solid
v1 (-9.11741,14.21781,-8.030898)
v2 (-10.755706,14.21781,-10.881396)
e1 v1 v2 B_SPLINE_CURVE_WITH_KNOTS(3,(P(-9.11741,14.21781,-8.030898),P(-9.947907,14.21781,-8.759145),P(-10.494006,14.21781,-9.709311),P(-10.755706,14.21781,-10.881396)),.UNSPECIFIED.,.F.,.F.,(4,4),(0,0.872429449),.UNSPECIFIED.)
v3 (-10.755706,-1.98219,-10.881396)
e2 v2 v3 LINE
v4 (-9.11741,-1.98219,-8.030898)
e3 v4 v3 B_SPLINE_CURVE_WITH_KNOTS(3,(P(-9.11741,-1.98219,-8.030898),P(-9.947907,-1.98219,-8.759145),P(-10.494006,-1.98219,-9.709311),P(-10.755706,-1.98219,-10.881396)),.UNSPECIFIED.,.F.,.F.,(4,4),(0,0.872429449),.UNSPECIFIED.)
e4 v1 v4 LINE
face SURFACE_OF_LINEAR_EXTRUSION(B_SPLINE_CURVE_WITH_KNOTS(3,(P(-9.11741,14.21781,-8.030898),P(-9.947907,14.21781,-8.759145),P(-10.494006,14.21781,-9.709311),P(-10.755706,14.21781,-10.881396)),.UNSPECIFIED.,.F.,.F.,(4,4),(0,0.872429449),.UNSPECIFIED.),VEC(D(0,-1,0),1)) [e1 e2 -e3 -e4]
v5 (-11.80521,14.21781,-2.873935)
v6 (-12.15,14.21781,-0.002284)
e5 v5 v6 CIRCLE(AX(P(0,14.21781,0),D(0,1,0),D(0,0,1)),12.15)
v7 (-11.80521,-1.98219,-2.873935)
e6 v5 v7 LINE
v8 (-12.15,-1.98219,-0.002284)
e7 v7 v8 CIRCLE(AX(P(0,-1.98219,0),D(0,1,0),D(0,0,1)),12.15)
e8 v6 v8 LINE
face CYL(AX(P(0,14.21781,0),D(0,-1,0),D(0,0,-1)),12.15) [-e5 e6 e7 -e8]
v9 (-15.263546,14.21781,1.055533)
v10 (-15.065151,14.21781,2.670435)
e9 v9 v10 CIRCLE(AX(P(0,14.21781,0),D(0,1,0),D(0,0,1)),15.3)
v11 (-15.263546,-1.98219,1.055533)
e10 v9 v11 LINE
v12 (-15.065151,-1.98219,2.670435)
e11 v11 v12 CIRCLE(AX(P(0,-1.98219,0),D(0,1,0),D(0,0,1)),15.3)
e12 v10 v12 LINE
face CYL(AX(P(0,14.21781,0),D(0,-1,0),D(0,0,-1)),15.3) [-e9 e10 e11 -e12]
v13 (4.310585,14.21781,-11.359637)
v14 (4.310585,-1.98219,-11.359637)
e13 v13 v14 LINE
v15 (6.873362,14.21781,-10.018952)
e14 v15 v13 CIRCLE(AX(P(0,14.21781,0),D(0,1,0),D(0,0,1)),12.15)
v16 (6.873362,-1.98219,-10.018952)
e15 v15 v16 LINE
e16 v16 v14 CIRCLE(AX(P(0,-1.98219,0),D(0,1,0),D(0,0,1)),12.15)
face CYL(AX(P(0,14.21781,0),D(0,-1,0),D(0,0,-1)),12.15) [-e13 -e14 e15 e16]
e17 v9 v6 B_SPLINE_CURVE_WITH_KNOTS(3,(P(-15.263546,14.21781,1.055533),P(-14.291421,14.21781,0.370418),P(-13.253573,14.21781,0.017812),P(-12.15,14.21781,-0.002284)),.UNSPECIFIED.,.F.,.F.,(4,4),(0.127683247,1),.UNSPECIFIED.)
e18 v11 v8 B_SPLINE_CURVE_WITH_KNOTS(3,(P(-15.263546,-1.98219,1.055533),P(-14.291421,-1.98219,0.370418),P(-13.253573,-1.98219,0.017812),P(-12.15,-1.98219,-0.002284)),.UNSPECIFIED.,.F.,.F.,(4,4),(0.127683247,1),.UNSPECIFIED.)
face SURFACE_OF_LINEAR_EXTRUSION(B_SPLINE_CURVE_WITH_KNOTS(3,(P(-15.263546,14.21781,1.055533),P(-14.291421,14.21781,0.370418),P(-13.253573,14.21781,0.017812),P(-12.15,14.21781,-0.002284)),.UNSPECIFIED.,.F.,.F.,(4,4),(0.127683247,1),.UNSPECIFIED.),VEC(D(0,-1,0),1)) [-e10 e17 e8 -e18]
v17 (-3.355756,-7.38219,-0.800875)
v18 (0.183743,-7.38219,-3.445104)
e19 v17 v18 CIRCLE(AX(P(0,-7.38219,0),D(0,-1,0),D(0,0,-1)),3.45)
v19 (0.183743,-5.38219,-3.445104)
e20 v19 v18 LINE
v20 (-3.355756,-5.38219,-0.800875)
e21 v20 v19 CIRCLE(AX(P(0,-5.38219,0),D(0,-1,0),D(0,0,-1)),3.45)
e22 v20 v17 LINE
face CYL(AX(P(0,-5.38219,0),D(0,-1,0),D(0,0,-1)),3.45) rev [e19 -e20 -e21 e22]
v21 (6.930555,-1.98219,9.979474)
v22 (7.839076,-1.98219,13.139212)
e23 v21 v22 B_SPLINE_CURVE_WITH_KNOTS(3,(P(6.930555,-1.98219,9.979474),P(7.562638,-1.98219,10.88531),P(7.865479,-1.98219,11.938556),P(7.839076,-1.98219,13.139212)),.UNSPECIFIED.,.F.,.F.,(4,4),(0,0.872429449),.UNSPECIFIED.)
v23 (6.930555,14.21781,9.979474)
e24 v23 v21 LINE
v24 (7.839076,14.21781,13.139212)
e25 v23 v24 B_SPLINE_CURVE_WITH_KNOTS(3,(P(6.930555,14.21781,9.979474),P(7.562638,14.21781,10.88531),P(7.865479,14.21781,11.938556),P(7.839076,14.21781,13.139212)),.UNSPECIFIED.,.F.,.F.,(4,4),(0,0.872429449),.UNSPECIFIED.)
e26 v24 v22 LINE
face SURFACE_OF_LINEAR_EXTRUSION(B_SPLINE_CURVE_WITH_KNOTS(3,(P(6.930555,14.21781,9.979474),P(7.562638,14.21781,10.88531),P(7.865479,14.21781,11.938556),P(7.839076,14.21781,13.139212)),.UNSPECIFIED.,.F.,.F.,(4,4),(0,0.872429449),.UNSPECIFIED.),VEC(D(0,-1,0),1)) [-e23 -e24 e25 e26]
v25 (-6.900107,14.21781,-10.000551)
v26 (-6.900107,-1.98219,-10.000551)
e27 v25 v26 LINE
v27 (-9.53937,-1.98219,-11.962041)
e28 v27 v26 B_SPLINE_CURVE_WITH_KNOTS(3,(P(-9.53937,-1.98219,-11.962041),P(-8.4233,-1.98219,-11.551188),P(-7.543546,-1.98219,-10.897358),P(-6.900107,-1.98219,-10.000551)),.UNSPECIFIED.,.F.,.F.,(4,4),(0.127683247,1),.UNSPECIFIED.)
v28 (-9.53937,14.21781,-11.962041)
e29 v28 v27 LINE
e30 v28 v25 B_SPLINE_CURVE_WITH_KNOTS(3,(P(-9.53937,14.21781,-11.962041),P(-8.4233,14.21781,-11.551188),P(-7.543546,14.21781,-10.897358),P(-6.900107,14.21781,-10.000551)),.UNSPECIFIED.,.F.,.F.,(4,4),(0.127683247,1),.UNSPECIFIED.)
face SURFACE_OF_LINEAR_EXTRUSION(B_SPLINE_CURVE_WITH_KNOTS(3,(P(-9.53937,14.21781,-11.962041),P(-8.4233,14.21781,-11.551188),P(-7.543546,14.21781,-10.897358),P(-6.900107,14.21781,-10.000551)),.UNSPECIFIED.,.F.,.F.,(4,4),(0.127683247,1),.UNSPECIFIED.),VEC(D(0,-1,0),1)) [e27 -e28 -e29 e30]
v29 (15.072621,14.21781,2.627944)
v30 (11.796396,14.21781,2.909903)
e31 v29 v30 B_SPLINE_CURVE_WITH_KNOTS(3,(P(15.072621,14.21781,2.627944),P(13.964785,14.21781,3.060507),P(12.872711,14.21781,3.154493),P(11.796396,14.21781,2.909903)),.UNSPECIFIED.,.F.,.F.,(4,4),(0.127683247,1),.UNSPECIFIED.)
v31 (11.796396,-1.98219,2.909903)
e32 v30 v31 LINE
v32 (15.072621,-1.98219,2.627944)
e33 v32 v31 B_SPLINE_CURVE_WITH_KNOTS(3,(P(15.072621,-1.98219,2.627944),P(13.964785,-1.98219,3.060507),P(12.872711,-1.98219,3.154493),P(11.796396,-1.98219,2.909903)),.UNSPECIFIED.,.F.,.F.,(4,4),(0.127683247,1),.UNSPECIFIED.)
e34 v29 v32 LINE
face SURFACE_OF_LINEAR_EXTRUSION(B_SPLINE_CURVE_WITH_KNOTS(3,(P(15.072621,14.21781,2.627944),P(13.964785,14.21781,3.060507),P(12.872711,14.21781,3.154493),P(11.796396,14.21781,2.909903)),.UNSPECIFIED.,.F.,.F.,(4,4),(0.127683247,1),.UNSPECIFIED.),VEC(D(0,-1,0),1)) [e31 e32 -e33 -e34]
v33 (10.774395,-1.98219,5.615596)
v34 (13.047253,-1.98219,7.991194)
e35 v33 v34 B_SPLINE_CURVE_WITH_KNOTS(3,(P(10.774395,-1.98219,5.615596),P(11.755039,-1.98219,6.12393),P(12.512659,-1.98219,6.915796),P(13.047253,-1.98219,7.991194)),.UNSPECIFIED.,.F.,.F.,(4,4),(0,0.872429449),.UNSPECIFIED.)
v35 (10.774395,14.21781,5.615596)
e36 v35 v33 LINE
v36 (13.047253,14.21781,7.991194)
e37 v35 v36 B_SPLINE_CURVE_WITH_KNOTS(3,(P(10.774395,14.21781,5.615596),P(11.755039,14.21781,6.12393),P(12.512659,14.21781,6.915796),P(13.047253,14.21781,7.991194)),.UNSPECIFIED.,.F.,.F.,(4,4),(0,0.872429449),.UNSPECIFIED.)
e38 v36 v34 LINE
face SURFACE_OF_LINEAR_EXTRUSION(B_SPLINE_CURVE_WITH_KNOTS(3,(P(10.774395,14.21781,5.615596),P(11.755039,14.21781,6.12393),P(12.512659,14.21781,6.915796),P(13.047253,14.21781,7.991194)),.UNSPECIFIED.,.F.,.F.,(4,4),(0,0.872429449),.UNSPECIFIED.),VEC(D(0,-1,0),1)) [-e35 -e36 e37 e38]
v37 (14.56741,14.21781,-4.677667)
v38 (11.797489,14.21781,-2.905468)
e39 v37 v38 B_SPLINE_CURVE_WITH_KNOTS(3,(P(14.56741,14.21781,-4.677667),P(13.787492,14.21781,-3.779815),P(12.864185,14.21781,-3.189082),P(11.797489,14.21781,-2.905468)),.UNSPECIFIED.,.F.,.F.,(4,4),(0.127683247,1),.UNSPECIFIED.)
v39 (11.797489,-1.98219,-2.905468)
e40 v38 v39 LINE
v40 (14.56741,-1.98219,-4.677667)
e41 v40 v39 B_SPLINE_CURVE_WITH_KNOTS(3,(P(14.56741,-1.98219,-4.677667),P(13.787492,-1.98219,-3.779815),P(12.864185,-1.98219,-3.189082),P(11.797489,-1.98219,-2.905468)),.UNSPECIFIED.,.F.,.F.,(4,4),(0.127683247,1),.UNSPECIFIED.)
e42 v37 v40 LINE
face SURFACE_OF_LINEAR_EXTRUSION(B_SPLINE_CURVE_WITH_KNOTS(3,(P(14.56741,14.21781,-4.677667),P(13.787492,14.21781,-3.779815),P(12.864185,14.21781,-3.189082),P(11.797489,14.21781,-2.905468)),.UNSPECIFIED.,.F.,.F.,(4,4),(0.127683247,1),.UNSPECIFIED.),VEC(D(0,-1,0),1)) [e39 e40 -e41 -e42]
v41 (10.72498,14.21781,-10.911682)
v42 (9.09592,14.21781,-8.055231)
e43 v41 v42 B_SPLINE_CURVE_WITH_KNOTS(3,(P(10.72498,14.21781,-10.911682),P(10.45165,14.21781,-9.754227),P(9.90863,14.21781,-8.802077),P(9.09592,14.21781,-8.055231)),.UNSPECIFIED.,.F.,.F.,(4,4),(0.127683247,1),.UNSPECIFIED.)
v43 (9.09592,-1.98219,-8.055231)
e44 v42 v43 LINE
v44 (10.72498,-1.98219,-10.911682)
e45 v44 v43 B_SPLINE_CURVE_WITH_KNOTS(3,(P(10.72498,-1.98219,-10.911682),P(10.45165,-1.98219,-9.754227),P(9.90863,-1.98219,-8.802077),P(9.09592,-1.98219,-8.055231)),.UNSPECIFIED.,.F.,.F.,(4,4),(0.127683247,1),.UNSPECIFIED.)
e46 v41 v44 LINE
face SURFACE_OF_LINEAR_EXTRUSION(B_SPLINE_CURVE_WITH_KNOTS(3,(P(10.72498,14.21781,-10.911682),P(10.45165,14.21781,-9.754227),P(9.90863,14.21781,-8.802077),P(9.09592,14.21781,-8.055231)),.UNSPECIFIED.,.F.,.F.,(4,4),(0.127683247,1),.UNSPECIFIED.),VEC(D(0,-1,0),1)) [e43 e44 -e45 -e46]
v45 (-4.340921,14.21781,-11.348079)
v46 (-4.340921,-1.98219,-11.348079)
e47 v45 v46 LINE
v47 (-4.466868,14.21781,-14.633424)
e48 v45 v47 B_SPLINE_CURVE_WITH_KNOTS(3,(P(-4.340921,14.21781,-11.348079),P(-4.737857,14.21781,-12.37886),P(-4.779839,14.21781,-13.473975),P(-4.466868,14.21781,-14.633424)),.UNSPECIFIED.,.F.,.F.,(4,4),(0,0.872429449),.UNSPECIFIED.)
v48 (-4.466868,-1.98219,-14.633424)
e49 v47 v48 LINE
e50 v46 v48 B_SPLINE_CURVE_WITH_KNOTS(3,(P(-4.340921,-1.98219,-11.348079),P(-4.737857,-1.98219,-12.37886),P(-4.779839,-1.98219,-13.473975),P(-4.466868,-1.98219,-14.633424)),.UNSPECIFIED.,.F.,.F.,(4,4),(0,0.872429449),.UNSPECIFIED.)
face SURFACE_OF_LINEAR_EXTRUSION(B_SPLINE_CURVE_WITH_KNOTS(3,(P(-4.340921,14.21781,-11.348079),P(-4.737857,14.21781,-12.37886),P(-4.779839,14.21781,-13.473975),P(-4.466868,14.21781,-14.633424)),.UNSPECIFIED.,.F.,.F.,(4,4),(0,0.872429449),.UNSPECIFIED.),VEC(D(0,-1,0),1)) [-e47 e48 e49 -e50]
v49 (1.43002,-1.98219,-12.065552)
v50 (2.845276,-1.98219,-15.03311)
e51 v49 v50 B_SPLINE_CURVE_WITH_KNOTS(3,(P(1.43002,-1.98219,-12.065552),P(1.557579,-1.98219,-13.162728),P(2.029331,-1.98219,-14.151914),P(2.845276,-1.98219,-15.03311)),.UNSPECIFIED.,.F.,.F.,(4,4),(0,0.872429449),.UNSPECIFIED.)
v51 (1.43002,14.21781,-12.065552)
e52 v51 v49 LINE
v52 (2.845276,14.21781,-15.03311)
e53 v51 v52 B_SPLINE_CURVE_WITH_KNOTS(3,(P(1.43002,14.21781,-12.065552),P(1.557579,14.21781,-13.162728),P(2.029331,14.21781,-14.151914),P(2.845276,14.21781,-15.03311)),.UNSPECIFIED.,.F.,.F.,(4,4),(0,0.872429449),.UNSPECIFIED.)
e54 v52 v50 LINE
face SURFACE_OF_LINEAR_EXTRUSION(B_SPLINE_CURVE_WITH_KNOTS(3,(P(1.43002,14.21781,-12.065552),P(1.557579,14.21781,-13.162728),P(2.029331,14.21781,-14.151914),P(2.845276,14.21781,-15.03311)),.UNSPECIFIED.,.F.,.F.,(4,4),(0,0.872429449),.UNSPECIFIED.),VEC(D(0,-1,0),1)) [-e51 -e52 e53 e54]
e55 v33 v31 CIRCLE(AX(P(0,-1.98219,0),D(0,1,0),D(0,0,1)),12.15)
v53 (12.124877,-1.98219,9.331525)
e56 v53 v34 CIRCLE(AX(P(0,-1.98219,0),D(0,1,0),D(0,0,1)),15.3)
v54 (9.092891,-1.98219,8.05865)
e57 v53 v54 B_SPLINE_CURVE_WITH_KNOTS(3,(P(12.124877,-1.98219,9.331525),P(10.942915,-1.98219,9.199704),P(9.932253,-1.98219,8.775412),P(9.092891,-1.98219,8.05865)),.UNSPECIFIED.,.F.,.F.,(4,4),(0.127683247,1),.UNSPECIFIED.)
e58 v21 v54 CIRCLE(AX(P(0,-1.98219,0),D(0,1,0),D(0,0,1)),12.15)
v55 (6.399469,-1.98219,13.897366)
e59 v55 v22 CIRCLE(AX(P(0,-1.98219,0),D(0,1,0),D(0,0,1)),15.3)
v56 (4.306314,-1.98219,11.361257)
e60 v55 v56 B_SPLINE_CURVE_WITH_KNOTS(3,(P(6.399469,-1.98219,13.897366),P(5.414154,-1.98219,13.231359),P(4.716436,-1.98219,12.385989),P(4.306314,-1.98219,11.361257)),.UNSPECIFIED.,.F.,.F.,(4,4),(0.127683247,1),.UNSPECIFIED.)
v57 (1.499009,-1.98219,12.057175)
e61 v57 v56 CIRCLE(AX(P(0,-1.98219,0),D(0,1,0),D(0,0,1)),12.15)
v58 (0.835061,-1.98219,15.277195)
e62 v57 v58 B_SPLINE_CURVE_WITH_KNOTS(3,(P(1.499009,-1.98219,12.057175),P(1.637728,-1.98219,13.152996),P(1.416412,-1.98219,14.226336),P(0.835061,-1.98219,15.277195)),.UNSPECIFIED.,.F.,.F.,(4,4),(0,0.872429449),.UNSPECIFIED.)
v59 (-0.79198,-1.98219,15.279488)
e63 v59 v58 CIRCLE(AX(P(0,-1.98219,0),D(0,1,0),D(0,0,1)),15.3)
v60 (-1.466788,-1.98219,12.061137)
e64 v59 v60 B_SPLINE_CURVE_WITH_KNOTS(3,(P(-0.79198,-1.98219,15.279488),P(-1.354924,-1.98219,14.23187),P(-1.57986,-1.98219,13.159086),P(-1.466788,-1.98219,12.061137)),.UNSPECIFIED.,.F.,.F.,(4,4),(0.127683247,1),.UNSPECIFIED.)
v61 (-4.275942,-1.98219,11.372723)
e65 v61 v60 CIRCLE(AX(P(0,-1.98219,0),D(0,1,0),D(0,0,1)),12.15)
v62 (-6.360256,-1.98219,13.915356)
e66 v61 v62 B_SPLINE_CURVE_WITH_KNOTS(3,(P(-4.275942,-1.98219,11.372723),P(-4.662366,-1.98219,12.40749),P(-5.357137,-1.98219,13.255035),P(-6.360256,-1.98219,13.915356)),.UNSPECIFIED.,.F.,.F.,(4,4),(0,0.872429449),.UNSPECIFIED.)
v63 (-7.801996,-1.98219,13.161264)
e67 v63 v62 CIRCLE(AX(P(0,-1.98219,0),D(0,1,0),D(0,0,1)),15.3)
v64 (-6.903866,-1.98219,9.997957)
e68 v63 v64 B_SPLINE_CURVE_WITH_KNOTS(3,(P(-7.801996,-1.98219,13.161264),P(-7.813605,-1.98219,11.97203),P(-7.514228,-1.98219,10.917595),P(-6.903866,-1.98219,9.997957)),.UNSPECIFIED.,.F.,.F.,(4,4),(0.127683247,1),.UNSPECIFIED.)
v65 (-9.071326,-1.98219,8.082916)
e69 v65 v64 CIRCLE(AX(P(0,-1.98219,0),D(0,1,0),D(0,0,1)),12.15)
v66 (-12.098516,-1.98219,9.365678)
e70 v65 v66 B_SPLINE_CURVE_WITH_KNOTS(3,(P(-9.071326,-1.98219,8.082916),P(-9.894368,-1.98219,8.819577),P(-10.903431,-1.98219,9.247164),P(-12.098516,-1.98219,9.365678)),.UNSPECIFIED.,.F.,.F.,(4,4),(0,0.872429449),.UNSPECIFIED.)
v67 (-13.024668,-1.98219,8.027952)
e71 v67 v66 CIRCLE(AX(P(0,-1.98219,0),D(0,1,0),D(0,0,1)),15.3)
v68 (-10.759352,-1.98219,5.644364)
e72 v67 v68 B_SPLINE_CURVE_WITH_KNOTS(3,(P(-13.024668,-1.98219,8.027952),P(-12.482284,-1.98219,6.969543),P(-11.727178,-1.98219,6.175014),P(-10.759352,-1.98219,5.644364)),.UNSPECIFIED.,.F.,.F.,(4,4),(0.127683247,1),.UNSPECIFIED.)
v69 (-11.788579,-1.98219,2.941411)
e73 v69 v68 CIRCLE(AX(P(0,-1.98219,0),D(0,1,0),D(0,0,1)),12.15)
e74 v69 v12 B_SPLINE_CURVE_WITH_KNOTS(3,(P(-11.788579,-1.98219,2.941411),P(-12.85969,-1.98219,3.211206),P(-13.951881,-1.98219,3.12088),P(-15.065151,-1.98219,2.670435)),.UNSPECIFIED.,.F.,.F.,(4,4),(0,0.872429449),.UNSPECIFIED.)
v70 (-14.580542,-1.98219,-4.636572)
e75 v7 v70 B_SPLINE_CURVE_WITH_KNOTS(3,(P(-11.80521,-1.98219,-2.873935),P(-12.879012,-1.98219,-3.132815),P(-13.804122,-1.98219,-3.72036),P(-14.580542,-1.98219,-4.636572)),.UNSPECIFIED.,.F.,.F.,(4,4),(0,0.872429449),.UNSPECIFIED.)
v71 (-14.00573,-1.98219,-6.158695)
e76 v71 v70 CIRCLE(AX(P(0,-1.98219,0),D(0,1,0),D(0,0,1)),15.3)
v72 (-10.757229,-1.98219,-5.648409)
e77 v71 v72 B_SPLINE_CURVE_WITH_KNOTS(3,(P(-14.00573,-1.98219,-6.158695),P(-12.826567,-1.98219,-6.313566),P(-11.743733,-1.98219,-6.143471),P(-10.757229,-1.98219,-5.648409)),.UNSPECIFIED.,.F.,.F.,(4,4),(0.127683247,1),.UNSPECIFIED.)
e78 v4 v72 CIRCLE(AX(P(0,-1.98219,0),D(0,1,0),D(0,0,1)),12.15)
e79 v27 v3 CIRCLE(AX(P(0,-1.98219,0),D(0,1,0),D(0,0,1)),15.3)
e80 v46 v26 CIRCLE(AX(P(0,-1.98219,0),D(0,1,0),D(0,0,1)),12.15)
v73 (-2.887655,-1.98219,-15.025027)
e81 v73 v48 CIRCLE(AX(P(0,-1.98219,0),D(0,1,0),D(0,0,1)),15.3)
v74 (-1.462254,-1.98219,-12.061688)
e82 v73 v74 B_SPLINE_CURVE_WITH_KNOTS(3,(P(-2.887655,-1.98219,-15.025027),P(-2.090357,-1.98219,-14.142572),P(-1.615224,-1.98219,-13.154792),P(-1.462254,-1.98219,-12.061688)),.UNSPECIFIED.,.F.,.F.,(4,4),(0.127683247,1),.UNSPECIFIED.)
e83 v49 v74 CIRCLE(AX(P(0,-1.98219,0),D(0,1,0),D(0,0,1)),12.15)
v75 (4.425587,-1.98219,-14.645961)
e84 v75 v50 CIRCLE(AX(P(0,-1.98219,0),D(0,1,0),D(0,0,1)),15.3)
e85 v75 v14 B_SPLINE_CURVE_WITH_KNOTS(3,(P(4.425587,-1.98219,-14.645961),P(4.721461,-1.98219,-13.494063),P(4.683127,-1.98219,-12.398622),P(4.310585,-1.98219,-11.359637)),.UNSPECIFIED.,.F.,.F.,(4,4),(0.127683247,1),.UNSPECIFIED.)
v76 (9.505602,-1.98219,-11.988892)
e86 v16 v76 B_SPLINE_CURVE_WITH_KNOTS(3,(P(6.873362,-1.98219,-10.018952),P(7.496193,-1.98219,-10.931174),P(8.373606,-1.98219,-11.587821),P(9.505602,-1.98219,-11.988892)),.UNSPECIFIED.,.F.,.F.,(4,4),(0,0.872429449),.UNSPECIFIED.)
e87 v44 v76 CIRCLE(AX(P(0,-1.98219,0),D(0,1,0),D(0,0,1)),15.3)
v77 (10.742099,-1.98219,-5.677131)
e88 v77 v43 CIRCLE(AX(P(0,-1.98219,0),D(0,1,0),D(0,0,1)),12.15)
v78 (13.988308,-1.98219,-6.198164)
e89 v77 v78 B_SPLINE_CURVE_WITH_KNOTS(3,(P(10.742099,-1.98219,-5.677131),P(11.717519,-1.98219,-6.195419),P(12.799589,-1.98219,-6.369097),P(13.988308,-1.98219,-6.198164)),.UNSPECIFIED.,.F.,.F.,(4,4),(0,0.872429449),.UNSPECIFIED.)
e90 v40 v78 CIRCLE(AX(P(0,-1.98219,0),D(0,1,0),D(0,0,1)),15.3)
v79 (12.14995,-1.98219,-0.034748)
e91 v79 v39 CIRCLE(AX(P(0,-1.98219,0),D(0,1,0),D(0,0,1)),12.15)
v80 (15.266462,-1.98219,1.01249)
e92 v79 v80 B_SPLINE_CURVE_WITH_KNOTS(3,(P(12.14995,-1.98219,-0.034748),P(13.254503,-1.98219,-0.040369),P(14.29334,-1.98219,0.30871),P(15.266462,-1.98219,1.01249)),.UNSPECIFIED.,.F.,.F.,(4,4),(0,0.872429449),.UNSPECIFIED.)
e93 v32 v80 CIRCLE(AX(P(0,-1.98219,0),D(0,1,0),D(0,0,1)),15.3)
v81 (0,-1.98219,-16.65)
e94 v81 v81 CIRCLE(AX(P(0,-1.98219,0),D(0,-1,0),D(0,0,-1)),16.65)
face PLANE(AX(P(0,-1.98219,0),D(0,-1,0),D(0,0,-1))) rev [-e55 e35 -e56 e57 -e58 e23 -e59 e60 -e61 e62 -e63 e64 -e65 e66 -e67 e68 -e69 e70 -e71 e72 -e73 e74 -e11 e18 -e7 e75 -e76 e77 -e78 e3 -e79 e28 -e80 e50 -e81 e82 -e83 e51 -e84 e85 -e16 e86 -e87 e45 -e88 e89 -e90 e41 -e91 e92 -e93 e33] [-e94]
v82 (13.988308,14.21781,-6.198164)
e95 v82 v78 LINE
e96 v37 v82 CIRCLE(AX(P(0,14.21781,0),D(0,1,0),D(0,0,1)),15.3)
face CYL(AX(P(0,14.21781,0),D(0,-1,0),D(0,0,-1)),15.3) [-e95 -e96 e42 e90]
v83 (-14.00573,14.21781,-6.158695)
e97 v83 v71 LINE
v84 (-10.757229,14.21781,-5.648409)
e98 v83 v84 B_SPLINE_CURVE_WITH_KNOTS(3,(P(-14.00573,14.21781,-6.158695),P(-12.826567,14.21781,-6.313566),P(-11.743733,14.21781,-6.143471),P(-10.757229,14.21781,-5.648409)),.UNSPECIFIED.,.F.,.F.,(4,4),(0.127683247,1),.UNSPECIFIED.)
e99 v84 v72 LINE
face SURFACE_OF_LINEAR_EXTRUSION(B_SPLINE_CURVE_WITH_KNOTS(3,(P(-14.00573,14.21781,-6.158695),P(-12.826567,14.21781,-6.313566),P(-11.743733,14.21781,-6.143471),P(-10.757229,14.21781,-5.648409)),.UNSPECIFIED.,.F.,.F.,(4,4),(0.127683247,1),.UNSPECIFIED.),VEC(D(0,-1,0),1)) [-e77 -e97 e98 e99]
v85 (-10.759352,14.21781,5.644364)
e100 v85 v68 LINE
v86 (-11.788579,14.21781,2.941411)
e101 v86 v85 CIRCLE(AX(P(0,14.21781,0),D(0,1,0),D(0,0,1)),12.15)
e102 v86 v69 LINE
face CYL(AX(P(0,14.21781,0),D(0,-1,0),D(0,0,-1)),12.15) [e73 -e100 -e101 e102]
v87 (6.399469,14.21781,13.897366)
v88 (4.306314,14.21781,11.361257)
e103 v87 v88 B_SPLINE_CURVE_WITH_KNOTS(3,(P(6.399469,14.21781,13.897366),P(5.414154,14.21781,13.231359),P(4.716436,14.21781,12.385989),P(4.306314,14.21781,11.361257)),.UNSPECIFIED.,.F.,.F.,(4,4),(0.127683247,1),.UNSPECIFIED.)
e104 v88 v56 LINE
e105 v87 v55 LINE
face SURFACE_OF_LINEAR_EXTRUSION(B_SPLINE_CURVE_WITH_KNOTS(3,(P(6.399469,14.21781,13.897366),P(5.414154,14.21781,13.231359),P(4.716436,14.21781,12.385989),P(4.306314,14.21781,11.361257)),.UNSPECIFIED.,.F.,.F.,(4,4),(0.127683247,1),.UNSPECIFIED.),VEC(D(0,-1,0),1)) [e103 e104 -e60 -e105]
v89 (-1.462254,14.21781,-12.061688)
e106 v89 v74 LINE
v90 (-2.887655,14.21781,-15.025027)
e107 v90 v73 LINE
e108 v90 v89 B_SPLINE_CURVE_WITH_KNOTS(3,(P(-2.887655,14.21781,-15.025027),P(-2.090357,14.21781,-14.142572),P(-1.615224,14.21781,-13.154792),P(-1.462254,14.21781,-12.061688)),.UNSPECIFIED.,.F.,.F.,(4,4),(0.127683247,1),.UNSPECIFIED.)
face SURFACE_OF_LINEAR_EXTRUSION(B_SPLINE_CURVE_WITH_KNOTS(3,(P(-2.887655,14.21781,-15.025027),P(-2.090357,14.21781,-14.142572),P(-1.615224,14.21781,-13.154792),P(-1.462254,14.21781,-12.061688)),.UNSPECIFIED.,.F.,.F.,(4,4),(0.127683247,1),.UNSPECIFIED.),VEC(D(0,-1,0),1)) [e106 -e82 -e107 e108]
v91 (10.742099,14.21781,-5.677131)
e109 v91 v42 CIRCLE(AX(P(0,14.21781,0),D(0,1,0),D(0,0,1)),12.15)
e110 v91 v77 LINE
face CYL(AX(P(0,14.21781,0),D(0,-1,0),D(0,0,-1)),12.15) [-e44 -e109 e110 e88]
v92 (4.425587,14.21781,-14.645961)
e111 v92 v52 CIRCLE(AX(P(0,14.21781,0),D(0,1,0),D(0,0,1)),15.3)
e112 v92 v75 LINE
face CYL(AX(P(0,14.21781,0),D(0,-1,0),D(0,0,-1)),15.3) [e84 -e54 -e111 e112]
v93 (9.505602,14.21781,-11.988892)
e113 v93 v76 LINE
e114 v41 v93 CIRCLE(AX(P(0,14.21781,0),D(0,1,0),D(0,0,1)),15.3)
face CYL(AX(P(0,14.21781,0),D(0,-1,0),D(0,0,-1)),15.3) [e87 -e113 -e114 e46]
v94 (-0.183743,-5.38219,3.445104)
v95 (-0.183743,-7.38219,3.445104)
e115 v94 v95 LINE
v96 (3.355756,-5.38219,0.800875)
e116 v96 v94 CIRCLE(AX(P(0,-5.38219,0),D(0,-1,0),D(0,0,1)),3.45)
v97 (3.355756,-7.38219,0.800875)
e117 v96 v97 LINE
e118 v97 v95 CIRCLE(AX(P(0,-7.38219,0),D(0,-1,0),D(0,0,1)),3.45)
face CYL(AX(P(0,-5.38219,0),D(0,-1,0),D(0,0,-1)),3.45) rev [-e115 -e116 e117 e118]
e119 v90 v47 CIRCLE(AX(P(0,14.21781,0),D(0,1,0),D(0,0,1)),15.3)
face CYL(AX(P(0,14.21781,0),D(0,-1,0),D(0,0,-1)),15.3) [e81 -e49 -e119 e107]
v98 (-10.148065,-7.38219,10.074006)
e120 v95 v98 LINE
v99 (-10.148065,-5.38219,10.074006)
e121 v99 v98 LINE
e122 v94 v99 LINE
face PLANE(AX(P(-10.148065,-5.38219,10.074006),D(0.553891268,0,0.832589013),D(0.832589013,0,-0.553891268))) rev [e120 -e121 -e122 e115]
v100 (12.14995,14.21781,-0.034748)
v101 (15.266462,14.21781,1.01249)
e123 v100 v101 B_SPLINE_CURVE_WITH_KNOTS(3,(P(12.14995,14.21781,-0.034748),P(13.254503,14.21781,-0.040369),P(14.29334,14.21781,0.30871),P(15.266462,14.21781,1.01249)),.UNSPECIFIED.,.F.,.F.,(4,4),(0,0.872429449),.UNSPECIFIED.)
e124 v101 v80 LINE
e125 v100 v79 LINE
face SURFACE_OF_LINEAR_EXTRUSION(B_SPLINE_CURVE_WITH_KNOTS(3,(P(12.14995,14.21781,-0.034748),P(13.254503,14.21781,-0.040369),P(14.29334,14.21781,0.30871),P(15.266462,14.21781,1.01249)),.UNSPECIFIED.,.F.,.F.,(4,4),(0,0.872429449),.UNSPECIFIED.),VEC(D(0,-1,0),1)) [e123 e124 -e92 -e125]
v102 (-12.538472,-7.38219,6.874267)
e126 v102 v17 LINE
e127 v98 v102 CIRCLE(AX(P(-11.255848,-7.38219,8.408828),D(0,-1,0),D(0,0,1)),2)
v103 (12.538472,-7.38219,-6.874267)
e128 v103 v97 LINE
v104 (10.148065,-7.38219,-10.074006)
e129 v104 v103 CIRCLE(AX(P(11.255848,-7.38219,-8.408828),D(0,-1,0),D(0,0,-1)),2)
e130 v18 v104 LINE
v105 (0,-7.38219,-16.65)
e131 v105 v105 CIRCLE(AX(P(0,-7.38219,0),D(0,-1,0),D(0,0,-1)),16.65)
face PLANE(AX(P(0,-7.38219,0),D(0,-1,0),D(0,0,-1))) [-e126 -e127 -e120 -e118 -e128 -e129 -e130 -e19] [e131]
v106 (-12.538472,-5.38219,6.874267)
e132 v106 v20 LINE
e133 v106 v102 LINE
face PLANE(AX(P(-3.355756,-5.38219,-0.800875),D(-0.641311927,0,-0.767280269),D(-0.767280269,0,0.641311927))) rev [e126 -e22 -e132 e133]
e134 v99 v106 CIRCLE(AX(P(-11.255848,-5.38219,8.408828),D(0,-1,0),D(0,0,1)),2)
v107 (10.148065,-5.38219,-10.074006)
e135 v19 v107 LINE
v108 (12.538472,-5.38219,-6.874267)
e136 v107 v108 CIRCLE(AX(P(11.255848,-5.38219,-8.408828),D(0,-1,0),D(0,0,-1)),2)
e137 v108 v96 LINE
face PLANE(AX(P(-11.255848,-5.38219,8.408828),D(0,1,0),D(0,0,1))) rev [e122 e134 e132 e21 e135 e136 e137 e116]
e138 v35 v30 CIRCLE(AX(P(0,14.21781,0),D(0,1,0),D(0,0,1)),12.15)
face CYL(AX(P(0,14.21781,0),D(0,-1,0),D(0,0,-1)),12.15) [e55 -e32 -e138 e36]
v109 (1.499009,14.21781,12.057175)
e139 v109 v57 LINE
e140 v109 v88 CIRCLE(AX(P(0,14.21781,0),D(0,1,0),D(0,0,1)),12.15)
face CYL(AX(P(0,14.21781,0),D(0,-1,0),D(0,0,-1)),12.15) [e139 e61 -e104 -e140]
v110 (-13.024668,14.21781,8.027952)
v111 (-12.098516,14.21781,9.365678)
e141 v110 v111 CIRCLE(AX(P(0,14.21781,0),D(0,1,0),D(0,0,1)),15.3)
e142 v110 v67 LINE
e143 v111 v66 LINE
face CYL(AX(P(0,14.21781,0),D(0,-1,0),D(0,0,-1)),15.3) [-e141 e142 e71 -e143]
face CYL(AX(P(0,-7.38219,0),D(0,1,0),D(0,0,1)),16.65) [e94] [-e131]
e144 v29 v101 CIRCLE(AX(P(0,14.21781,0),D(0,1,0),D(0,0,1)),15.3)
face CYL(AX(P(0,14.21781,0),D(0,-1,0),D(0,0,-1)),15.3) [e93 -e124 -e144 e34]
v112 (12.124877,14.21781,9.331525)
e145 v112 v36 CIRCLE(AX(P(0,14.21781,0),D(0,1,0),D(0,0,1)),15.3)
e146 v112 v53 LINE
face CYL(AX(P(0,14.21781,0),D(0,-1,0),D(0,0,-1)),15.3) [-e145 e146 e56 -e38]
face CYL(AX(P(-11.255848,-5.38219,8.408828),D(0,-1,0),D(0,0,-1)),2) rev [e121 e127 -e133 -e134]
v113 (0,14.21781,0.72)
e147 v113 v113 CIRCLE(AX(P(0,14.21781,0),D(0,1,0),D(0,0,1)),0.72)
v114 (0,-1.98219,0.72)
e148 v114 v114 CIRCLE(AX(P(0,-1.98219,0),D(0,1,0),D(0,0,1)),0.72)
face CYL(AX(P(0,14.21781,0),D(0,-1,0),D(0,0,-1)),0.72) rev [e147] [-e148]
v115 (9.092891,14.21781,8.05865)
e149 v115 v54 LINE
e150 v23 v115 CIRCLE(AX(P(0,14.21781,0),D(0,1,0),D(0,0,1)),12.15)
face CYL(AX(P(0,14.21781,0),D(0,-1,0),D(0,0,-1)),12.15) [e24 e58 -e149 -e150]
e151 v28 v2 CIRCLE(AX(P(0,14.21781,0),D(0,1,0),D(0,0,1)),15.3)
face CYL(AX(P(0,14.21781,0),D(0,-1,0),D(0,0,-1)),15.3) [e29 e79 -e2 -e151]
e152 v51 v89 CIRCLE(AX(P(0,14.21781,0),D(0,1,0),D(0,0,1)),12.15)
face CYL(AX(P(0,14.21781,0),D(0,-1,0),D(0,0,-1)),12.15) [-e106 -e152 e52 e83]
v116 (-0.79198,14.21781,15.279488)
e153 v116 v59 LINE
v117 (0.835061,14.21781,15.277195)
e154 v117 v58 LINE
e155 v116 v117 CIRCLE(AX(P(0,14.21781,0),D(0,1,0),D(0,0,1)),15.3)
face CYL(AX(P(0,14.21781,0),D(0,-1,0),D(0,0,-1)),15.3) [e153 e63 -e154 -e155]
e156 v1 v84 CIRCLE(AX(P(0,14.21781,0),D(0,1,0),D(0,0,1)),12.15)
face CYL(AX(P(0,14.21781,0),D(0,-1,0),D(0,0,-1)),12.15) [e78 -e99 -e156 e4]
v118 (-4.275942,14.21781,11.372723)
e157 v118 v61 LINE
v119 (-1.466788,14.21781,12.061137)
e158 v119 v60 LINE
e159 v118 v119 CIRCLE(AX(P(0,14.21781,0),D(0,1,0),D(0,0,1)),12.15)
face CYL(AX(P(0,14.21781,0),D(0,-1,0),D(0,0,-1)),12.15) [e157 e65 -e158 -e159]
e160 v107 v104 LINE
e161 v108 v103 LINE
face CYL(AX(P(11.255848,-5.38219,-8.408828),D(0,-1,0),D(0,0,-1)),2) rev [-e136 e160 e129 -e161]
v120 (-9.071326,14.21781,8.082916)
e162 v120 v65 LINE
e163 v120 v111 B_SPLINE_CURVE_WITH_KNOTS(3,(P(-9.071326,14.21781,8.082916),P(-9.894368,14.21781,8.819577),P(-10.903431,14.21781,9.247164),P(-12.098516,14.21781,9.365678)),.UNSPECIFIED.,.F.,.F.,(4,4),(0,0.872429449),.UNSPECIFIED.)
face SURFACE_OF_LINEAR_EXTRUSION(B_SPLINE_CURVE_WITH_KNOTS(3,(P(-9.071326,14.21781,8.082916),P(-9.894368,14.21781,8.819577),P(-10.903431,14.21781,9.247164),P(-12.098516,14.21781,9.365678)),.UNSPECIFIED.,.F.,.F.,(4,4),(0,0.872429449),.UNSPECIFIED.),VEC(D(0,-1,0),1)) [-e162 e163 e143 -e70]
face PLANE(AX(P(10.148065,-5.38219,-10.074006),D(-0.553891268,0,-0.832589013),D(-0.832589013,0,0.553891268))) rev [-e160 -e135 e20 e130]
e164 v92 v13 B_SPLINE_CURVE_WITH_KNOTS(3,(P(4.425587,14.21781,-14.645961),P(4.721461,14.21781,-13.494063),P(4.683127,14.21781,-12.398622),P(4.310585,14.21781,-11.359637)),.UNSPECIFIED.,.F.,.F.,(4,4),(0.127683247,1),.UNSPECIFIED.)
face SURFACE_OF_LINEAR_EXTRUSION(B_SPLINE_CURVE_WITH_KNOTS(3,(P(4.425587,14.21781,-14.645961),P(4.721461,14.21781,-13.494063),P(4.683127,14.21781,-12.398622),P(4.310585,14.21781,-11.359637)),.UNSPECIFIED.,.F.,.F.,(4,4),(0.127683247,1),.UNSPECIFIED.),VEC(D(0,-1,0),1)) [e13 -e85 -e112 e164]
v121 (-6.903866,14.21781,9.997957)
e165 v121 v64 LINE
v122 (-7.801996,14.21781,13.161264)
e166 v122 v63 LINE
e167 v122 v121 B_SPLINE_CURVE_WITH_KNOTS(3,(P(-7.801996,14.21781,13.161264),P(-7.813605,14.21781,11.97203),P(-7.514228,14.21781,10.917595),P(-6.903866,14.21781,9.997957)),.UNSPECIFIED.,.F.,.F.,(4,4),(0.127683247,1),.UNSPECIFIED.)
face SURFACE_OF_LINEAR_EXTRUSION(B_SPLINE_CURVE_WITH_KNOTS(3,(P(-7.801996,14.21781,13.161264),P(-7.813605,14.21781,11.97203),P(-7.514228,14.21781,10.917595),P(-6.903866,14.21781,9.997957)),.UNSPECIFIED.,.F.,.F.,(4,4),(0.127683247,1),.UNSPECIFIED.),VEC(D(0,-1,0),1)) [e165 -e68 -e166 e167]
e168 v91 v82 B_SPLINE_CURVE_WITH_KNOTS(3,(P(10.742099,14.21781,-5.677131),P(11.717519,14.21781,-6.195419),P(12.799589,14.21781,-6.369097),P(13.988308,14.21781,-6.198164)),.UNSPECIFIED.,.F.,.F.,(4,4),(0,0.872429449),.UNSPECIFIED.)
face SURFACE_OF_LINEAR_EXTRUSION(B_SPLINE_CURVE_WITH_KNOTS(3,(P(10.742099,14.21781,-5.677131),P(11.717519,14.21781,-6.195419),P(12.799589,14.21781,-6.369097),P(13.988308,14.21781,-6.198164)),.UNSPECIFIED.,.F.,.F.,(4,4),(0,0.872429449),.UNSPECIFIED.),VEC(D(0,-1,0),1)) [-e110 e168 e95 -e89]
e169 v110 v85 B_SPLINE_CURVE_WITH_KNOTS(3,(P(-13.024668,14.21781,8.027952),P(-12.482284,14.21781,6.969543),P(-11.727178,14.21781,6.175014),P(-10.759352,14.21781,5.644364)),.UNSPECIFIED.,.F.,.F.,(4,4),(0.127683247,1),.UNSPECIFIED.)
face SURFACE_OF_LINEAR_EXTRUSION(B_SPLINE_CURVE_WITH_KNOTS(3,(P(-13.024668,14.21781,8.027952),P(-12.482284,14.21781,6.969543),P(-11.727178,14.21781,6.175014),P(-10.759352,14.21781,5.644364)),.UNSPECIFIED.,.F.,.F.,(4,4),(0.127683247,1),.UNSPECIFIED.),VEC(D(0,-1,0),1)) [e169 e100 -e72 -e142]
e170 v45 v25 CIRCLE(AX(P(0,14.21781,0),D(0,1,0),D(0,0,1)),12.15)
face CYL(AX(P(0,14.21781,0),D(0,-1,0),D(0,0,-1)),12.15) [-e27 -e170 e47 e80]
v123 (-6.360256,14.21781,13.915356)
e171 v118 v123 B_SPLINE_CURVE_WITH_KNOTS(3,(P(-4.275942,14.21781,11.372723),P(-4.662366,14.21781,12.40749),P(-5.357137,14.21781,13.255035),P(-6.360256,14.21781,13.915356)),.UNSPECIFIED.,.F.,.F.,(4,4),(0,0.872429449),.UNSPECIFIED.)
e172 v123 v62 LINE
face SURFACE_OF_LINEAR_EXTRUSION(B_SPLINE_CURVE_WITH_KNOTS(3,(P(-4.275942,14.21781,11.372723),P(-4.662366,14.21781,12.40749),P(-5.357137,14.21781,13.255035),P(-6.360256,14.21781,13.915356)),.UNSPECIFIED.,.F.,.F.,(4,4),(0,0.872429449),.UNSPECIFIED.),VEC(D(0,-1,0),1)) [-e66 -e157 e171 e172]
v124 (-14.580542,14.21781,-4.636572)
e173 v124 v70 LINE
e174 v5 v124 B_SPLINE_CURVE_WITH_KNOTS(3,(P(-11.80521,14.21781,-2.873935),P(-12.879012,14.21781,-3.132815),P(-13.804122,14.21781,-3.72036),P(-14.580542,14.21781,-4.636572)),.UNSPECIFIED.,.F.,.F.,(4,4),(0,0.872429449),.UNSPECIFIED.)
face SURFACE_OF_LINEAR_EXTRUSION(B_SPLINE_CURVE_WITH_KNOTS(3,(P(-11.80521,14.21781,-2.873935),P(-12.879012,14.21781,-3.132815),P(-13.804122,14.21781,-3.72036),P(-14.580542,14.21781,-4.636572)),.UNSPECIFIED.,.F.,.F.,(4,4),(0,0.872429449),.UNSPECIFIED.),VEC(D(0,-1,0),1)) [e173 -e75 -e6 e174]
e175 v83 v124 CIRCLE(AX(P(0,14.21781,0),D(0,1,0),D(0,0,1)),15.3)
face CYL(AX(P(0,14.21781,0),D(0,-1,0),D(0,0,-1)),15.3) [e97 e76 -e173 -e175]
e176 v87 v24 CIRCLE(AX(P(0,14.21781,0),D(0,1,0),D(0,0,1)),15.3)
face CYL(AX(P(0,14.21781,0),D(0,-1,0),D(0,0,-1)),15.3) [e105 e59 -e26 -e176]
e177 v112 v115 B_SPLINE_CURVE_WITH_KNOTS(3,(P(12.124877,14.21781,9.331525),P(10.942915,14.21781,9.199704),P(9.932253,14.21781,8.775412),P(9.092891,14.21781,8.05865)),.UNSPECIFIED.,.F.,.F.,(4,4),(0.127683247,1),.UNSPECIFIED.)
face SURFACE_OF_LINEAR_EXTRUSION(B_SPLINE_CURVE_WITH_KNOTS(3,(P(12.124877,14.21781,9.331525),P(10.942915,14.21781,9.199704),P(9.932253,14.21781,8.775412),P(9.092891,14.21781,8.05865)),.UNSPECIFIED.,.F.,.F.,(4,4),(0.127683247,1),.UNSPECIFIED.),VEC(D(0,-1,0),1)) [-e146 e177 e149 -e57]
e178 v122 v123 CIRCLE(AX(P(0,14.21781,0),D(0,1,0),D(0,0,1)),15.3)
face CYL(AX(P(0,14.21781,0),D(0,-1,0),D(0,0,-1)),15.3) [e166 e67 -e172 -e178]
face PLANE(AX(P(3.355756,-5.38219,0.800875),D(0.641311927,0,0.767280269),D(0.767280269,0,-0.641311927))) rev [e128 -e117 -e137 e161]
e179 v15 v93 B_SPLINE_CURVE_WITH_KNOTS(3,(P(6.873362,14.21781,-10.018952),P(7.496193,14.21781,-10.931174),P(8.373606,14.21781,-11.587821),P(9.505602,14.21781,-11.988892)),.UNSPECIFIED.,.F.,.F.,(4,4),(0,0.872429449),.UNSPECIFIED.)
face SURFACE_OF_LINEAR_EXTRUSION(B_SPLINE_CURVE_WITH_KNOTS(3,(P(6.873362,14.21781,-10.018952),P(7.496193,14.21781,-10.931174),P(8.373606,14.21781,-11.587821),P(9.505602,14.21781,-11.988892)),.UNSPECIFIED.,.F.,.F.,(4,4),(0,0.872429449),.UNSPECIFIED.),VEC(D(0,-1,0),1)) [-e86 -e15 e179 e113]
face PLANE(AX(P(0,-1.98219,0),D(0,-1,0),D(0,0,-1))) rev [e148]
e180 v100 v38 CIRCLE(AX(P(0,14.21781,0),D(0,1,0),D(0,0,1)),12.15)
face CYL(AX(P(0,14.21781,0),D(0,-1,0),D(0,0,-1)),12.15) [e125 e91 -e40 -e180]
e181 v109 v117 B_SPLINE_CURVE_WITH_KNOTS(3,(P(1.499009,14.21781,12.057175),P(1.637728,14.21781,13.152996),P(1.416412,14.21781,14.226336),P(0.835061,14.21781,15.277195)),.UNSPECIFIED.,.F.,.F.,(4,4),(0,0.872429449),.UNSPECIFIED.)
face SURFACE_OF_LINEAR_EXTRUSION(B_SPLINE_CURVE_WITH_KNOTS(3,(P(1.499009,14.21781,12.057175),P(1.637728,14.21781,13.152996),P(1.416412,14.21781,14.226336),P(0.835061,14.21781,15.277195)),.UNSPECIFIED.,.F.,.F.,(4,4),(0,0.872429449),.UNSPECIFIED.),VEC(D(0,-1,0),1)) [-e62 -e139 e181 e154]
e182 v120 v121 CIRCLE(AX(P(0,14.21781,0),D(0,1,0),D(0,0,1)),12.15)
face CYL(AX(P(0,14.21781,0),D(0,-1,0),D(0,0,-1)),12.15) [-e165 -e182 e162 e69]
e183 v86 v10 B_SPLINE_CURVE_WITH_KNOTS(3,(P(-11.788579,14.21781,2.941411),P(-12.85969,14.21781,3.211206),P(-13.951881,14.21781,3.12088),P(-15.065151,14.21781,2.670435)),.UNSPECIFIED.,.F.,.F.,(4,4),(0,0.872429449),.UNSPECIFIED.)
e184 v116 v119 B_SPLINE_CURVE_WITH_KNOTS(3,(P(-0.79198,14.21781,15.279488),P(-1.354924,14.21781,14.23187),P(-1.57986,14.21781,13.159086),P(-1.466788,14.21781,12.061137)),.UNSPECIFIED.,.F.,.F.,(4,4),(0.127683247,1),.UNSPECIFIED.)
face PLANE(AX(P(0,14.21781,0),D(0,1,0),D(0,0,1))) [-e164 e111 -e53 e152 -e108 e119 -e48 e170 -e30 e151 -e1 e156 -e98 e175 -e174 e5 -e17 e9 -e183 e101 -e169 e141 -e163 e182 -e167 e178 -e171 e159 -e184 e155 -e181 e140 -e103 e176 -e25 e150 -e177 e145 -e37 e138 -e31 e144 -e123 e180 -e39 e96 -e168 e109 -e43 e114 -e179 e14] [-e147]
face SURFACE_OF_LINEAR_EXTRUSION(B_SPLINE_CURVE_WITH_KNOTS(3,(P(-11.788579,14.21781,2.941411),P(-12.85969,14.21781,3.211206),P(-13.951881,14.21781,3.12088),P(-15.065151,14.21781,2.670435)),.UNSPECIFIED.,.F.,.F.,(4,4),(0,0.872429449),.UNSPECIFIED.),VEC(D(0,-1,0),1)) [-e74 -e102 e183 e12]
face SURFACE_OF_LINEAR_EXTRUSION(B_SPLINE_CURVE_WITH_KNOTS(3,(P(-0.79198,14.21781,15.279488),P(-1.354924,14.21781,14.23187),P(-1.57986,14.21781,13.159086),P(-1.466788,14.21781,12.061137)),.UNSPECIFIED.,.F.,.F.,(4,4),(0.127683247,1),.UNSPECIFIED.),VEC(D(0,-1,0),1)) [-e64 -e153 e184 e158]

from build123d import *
from OCP.BRepAlgoAPI import BRepAlgoAPI_Cut
from OCP.TopTools import TopTools_ListOfShape

# Parameters (mm, degrees)
SKETCH1_R           = 0.4
BOSS_EXTRUDE1_DEPTH = 9
SKETCH2_R           = 9.25
BOSS_EXTRUDE2_DEPTH = 3
SCALE1_SCALE        = 1.8
CUT_EXTRUDE1_DEPTH  = 2


with BuildPart() as part:
    # Sketch1 → Boss-Extrude1 (new body)
    with BuildSketch(Plane(origin=(0, 0, 0), x_dir=(1, 0, 0), z_dir=(0, 1, 0))):
        with BuildLine():
            add(Edge.make_bspline(
                [(-5.065227978, 4.461610195), (-5.526615005, 4.86619147), (-5.830003112, 5.39406146), (-5.975392301, 6.045220165)],
                knots=[0, 0, 0, 0, 0.872429449, 0.872429449, 0.872429449, 0.872429449], degree=3))
            ThreePointArc((-5.065227978, 4.461610195), (-5.560258819, 3.827012132), (-5.976238464, 3.138004752))
            add(Edge.make_bspline(
                [(-7.780961116, 3.42149735), (-7.125870497, 3.507536778), (-6.52429628, 3.413039245), (-5.976238464, 3.138004752)],
                knots=[0.127683247, 0.127683247, 0.127683247, 0.127683247, 1, 1, 1, 1], degree=3))
            ThreePointArc((-7.780961116, 3.42149735), (-7.951879756, 3.00293329), (-8.10030101, 2.575873357))
            add(Edge.make_bspline(
                [(-6.558450277, 1.596630818), (-7.155006493, 1.740452504), (-7.668956737, 2.066866683), (-8.10030101, 2.575873357)],
                knots=[0, 0, 0, 0, 0.872429449, 0.872429449, 0.872429449, 0.872429449], degree=3))
            ThreePointArc((-6.558450277, 1.596630818), (-6.701865893, 0.804669837), (-6.749999881, 0.00126872))
            add(Edge.make_bspline(
                [(-8.479748007, -0.586407486), (-7.939678588, -0.205787566), (-7.363095879, -0.009895497), (-6.749999881, 0.00126872)],
                knots=[0.127683247, 0.127683247, 0.127683247, 0.127683247, 1, 1, 1, 1], degree=3))
            ThreePointArc((-8.479748007, -0.586407486), (-8.436572529, -1.036457408), (-8.369528376, -1.483574994))
            add(Edge.make_bspline(
                [(-6.549210655, -1.634117437), (-7.144272221, -1.784003157), (-7.751044795, -1.733822342), (-8.369528376, -1.483574994)],
                knots=[0, 0, 0, 0, 0.872429449, 0.872429449, 0.872429449, 0.872429449], degree=3))
            ThreePointArc((-6.549210655, -1.634117437), (-6.308156258, -2.402012621), (-5.977417671, -3.13575796))
            add(Edge.make_bspline(
                [(-7.235926822, -4.459973434), (-6.934601997, -3.871968458), (-6.515098947, -3.4305633), (-5.977417671, -3.13575796)],
                knots=[0.127683247, 0.127683247, 0.127683247, 0.127683247, 1, 1, 1, 1], degree=3))
            ThreePointArc((-7.235926822, -4.459973434), (-6.988548208, -4.838408204), (-6.721397655, -5.203154193))
            add(Edge.make_bspline(
                [(-5.039625799, -4.490509081), (-5.496871281, -4.899765193), (-6.0574619, -5.137313564), (-6.721397655, -5.203154193)],
                knots=[0, 0, 0, 0, 0.872429449, 0.872429449, 0.872429449, 0.872429449], degree=3))
            ThreePointArc((-5.039625799, -4.490509081), (-4.469324045, -5.058422935), (-3.835481109, -5.554420281))
            add(Edge.make_bspline(
                [(-4.334442004, -7.311813216), (-4.34089166, -6.651128039), (-4.174571361, -6.065330394), (-3.835481109, -5.554420281)],
                knots=[0.127683247, 0.127683247, 0.127683247, 0.127683247, 1, 1, 1, 1], degree=3))
            ThreePointArc((-4.334442004, -7.311813216), (-3.939531713, -7.53193799), (-3.533475733, -7.730753472))
            add(Edge.make_bspline(
                [(-2.375523406, -6.318179211), (-2.590203375, -6.893050073), (-2.976187484, -7.36390816), (-3.533475733, -7.730753472)],
                knots=[0, 0, 0, 0, 0.872429449, 0.872429449, 0.872429449, 0.872429449], degree=3))
            ThreePointArc((-2.375523406, -6.318179211), (-1.606623554, -6.556009515), (-0.814882047, -6.700631854))
            add(Edge.make_bspline(
                [(-0.439988759, -8.488604708), (-0.752735357, -7.906594341), (-0.877699786, -7.31060339), (-0.814882047, -6.700631854)],
                knots=[0.127683247, 0.127683247, 0.127683247, 0.127683247, 1, 1, 1, 1], degree=3))
            ThreePointArc((-0.439988759, -8.488604708), (0.011984021, -8.499991552), (0.463922896, -8.487330296))
            add(Edge.make_bspline(
                [(0.832782771, -6.698430626), (0.909848909, -7.307220251), (0.786895617, -7.903520141), (0.463922896, -8.487330296)],
                knots=[0, 0, 0, 0, 0.872429449, 0.872429449, 0.872429449, 0.872429449], degree=3))
            ThreePointArc((0.832782771, -6.698430626), (1.624135031, -6.551693323), (2.392396671, -6.311809421))
            add(Edge.make_bspline(
                [(3.555260608, -7.72075916), (3.007863545, -7.350755165), (2.620242233, -6.881105252), (2.392396671, -6.311809421)],
                knots=[0.127683247, 0.127683247, 0.127683247, 0.127683247, 1, 1, 1, 1], degree=3))
            ThreePointArc((3.555260608, -7.72075916), (3.96075436, -7.520799485), (4.355042381, -7.299562032))
            add(Edge.make_bspline(
                [(3.850308451, -5.54415231), (4.201465773, -6.047394331), (4.369710416, -6.632530905), (4.355042381, -7.299562032)],
                knots=[0, 0, 0, 0, 0.872429449, 0.872429449, 0.872429449, 0.872429449], degree=3))
            ThreePointArc((3.850308451, -5.54415231), (4.482823853, -5.046463148), (5.051606144, -4.477027515))
            add(Edge.make_bspline(
                [(6.736042616, -5.184180734), (6.079397157, -5.110946566), (5.517918333, -4.875228826), (5.051606144, -4.477027515)],
                knots=[0.127683247, 0.127683247, 0.127683247, 0.127683247, 1, 1, 1, 1], degree=3))
            ThreePointArc((6.736042616, -5.184180734), (7.002163607, -4.818682892), (7.24847414, -4.439552076))
            add(Edge.make_bspline(
                [(5.985774866, -3.119775513), (6.530577461, -3.402183249), (6.951477219, -3.84210877), (7.24847414, -4.439552076)],
                knots=[0, 0, 0, 0, 0.872429449, 0.872429449, 0.872429449, 0.872429449], degree=3))
            ThreePointArc((5.985774866, -3.119775513), (6.314551754, -2.385149082), (6.553553527, -1.616612559))
            add(Edge.make_bspline(
                [(8.373678438, -1.459968977), (7.758214146, -1.700281702), (7.151505842, -1.75249623), (6.553553527, -1.616612559)],
                knots=[0.127683247, 0.127683247, 0.127683247, 0.127683247, 1, 1, 1, 1], degree=3))
            ThreePointArc((8.373678438, -1.459968977), (8.439461558, -1.01266412), (8.481367828, -0.562494242))
            add(Edge.make_bspline(
                [(6.749972396, 0.019304256), (7.363612555, 0.022427015), (7.940744366, -0.171505818), (8.481367828, -0.562494242)],
                knots=[0, 0, 0, 0, 0.872429449, 0.872429449, 0.872429449, 0.872429449], degree=3))
            ThreePointArc((6.749972396, 0.019304256), (6.699691947, 0.822573894), (6.554160776, 1.614148852))
            add(Edge.make_bspline(
                [(8.093005444, 2.598704077), (7.65971777, 2.099897208), (7.146769547, 1.771712133), (6.554160776, 1.614148852)],
                knots=[0.127683247, 0.127683247, 0.127683247, 0.127683247, 1, 1, 1, 1], degree=3))
            ThreePointArc((8.093005444, 2.598704077), (7.943380571, 3.025343799), (7.771282357, 3.443424244))
            add(Edge.make_bspline(
                [(5.967832596, 3.153961653), (6.509732754, 3.44189952), (7.110882674, 3.53838705), (7.771282357, 3.443424244)],
                knots=[0, 0, 0, 0, 0.872429449, 0.872429449, 0.872429449, 0.872429449], degree=3))
            ThreePointArc((5.967832596, 3.153961653), (5.550013455, 3.841855105), (5.053288778, 4.475128213))
            add(Edge.make_bspline(
                [(5.958322434, 6.062045345), (5.806472362, 5.419014975), (5.504794477, 4.890042598), (5.053288778, 4.475128213)],
                knots=[0.127683247, 0.127683247, 0.127683247, 0.127683247, 1, 1, 1, 1], degree=3))
            ThreePointArc((5.958322434, 6.062045345), (5.627566824, 6.370281912), (5.280889753, 6.660495734))
            add(Edge.make_bspline(
                [(3.818534268, 5.566084444), (4.16455163, 6.072874324), (4.652003458, 6.437678087), (5.280889753, 6.660495734)],
                knots=[0, 0, 0, 0, 0.872429449, 0.872429449, 0.872429449, 0.872429449], degree=3))
            ThreePointArc((3.818534268, 5.566084444), (3.128893766, 5.98101361), (2.394769219, 6.310909632))
            add(Edge.make_bspline(
                [(2.45865956, 8.136645081), (2.623034112, 7.496701718), (2.601737332, 6.888123235), (2.394769219, 6.310909632)],
                knots=[0.127683247, 0.127683247, 0.127683247, 0.127683247, 1, 1, 1, 1], degree=3))
            ThreePointArc((2.45865956, 8.136645081), (2.022545337, 8.25586521), (1.580708948, 8.351727918))
            add(Edge.make_bspline(
                [(0.794455758, 6.703084368), (0.865321915, 7.312626807), (1.127406312, 7.862174657), (1.580708948, 8.351727918)],
                knots=[0, 0, 0, 0, 0.872429449, 0.872429449, 0.872429449, 0.872429449], degree=3))
            ThreePointArc((0.794455758, 6.703084368), (-0.009017778, 6.749993976), (-0.812363108, 6.700937709))
            add(Edge.make_bspline(
                [(-1.604252589, 8.347237485), (-1.161309642, 7.856984441), (-0.897346481, 7.308217849), (-0.812363108, 6.700937709)],
                knots=[0.127683247, 0.127683247, 0.127683247, 0.127683247, 1, 1, 1, 1], degree=3))
            ThreePointArc((-1.604252589, 8.347237485), (-2.045816912, 8.250129282), (-2.481593228, 8.129679886))
            add(Edge.make_bspline(
                [(-2.411622992, 6.304488444), (-2.632142622, 6.877144615), (-2.655466033, 7.485541762), (-2.481593228, 8.129679886)],
                knots=[0, 0, 0, 0, 0.872429449, 0.872429449, 0.872429449, 0.872429449], degree=3))
            ThreePointArc((-2.411622992, 6.304488444), (-3.144863458, 5.972632069), (-3.833392837, 5.555861712))
            add(Edge.make_bspline(
                [(-5.299649804, 6.645578377), (-4.679611352, 6.417326717), (-4.19085903, 6.054087828), (-3.833392837, 5.555861712)],
                knots=[0.127683247, 0.127683247, 0.127683247, 0.127683247, 1, 1, 1, 1], degree=3))
            ThreePointArc((-5.299649804, 6.645578377), (-5.645507162, 6.35438816), (-5.975392301, 6.045220165))
        make_face()
        Circle(SKETCH1_R, mode=Mode.SUBTRACT)
    extrude(amount=BOSS_EXTRUDE1_DEPTH)

    # Sketch2 → Boss-Extrude2 (add)
    with BuildSketch(Plane.XZ):
        Circle(SKETCH2_R)
    extrude(amount=BOSS_EXTRUDE2_DEPTH)


with BuildPart() as part_1:
    # Scale1: scaled about (0, 2.477742253, 0)
    add(part.part.scale(SCALE1_SCALE).moved(Location((0, -1.982193802, 0))))


with BuildPart() as cut_extrude1_tool:
    # Sketch3 → Cut-Extrude1 (new body)
    with BuildSketch(Plane.XZ.offset(7.382189851)):
        with BuildLine():
            Line((-10.14806543, 10.074005921), (-0.183742843, 3.445103564))
            ThreePointArc((-0.183742843, 3.445103564), (2.064801156, 2.763891493), (3.355756213, 0.800874672))
            Line((3.355756213, 0.800874672), (12.53847182, -6.874267357))
            ThreePointArc((12.53847182, -6.874267357), (12.858103903, -9.605814074), (10.14806543, -10.074005921))
            Line((10.14806543, -10.074005921), (0.183742843, -3.445103564))
            ThreePointArc((0.183742843, -3.445103564), (-2.064801156, -2.763891493), (-3.355756213, -0.800874672))
            Line((-3.355756213, -0.800874672), (-12.53847182, 6.874267357))
            ThreePointArc((-12.53847182, 6.874267357), (-12.858103903, 9.605814074), (-10.14806543, 10.074005921))
        make_face()
    extrude(amount=-CUT_EXTRUDE1_DEPTH)


with BuildPart() as part_2:
    add(part_1.part)

    # Cut-Extrude1: cut by cut_extrude1_tool, with a tolerance
    cut_extrude1_stock = TopTools_ListOfShape()
    cut_extrude1_stock.Append(part_2.part.wrapped)
    cut_extrude1_tools = TopTools_ListOfShape()
    cut_extrude1_tools.Append(cut_extrude1_tool.part.wrapped)
    cut_extrude1_cut = BRepAlgoAPI_Cut()
    cut_extrude1_cut.SetArguments(cut_extrude1_stock)
    cut_extrude1_cut.SetTools(cut_extrude1_tools)
    cut_extrude1_cut.SetFuzzyValue(0.00001)
    cut_extrude1_cut.Build()
    add(Compound.cast(cut_extrude1_cut.Shape()).solids(), mode=Mode.REPLACE)


solid = part_2.part
